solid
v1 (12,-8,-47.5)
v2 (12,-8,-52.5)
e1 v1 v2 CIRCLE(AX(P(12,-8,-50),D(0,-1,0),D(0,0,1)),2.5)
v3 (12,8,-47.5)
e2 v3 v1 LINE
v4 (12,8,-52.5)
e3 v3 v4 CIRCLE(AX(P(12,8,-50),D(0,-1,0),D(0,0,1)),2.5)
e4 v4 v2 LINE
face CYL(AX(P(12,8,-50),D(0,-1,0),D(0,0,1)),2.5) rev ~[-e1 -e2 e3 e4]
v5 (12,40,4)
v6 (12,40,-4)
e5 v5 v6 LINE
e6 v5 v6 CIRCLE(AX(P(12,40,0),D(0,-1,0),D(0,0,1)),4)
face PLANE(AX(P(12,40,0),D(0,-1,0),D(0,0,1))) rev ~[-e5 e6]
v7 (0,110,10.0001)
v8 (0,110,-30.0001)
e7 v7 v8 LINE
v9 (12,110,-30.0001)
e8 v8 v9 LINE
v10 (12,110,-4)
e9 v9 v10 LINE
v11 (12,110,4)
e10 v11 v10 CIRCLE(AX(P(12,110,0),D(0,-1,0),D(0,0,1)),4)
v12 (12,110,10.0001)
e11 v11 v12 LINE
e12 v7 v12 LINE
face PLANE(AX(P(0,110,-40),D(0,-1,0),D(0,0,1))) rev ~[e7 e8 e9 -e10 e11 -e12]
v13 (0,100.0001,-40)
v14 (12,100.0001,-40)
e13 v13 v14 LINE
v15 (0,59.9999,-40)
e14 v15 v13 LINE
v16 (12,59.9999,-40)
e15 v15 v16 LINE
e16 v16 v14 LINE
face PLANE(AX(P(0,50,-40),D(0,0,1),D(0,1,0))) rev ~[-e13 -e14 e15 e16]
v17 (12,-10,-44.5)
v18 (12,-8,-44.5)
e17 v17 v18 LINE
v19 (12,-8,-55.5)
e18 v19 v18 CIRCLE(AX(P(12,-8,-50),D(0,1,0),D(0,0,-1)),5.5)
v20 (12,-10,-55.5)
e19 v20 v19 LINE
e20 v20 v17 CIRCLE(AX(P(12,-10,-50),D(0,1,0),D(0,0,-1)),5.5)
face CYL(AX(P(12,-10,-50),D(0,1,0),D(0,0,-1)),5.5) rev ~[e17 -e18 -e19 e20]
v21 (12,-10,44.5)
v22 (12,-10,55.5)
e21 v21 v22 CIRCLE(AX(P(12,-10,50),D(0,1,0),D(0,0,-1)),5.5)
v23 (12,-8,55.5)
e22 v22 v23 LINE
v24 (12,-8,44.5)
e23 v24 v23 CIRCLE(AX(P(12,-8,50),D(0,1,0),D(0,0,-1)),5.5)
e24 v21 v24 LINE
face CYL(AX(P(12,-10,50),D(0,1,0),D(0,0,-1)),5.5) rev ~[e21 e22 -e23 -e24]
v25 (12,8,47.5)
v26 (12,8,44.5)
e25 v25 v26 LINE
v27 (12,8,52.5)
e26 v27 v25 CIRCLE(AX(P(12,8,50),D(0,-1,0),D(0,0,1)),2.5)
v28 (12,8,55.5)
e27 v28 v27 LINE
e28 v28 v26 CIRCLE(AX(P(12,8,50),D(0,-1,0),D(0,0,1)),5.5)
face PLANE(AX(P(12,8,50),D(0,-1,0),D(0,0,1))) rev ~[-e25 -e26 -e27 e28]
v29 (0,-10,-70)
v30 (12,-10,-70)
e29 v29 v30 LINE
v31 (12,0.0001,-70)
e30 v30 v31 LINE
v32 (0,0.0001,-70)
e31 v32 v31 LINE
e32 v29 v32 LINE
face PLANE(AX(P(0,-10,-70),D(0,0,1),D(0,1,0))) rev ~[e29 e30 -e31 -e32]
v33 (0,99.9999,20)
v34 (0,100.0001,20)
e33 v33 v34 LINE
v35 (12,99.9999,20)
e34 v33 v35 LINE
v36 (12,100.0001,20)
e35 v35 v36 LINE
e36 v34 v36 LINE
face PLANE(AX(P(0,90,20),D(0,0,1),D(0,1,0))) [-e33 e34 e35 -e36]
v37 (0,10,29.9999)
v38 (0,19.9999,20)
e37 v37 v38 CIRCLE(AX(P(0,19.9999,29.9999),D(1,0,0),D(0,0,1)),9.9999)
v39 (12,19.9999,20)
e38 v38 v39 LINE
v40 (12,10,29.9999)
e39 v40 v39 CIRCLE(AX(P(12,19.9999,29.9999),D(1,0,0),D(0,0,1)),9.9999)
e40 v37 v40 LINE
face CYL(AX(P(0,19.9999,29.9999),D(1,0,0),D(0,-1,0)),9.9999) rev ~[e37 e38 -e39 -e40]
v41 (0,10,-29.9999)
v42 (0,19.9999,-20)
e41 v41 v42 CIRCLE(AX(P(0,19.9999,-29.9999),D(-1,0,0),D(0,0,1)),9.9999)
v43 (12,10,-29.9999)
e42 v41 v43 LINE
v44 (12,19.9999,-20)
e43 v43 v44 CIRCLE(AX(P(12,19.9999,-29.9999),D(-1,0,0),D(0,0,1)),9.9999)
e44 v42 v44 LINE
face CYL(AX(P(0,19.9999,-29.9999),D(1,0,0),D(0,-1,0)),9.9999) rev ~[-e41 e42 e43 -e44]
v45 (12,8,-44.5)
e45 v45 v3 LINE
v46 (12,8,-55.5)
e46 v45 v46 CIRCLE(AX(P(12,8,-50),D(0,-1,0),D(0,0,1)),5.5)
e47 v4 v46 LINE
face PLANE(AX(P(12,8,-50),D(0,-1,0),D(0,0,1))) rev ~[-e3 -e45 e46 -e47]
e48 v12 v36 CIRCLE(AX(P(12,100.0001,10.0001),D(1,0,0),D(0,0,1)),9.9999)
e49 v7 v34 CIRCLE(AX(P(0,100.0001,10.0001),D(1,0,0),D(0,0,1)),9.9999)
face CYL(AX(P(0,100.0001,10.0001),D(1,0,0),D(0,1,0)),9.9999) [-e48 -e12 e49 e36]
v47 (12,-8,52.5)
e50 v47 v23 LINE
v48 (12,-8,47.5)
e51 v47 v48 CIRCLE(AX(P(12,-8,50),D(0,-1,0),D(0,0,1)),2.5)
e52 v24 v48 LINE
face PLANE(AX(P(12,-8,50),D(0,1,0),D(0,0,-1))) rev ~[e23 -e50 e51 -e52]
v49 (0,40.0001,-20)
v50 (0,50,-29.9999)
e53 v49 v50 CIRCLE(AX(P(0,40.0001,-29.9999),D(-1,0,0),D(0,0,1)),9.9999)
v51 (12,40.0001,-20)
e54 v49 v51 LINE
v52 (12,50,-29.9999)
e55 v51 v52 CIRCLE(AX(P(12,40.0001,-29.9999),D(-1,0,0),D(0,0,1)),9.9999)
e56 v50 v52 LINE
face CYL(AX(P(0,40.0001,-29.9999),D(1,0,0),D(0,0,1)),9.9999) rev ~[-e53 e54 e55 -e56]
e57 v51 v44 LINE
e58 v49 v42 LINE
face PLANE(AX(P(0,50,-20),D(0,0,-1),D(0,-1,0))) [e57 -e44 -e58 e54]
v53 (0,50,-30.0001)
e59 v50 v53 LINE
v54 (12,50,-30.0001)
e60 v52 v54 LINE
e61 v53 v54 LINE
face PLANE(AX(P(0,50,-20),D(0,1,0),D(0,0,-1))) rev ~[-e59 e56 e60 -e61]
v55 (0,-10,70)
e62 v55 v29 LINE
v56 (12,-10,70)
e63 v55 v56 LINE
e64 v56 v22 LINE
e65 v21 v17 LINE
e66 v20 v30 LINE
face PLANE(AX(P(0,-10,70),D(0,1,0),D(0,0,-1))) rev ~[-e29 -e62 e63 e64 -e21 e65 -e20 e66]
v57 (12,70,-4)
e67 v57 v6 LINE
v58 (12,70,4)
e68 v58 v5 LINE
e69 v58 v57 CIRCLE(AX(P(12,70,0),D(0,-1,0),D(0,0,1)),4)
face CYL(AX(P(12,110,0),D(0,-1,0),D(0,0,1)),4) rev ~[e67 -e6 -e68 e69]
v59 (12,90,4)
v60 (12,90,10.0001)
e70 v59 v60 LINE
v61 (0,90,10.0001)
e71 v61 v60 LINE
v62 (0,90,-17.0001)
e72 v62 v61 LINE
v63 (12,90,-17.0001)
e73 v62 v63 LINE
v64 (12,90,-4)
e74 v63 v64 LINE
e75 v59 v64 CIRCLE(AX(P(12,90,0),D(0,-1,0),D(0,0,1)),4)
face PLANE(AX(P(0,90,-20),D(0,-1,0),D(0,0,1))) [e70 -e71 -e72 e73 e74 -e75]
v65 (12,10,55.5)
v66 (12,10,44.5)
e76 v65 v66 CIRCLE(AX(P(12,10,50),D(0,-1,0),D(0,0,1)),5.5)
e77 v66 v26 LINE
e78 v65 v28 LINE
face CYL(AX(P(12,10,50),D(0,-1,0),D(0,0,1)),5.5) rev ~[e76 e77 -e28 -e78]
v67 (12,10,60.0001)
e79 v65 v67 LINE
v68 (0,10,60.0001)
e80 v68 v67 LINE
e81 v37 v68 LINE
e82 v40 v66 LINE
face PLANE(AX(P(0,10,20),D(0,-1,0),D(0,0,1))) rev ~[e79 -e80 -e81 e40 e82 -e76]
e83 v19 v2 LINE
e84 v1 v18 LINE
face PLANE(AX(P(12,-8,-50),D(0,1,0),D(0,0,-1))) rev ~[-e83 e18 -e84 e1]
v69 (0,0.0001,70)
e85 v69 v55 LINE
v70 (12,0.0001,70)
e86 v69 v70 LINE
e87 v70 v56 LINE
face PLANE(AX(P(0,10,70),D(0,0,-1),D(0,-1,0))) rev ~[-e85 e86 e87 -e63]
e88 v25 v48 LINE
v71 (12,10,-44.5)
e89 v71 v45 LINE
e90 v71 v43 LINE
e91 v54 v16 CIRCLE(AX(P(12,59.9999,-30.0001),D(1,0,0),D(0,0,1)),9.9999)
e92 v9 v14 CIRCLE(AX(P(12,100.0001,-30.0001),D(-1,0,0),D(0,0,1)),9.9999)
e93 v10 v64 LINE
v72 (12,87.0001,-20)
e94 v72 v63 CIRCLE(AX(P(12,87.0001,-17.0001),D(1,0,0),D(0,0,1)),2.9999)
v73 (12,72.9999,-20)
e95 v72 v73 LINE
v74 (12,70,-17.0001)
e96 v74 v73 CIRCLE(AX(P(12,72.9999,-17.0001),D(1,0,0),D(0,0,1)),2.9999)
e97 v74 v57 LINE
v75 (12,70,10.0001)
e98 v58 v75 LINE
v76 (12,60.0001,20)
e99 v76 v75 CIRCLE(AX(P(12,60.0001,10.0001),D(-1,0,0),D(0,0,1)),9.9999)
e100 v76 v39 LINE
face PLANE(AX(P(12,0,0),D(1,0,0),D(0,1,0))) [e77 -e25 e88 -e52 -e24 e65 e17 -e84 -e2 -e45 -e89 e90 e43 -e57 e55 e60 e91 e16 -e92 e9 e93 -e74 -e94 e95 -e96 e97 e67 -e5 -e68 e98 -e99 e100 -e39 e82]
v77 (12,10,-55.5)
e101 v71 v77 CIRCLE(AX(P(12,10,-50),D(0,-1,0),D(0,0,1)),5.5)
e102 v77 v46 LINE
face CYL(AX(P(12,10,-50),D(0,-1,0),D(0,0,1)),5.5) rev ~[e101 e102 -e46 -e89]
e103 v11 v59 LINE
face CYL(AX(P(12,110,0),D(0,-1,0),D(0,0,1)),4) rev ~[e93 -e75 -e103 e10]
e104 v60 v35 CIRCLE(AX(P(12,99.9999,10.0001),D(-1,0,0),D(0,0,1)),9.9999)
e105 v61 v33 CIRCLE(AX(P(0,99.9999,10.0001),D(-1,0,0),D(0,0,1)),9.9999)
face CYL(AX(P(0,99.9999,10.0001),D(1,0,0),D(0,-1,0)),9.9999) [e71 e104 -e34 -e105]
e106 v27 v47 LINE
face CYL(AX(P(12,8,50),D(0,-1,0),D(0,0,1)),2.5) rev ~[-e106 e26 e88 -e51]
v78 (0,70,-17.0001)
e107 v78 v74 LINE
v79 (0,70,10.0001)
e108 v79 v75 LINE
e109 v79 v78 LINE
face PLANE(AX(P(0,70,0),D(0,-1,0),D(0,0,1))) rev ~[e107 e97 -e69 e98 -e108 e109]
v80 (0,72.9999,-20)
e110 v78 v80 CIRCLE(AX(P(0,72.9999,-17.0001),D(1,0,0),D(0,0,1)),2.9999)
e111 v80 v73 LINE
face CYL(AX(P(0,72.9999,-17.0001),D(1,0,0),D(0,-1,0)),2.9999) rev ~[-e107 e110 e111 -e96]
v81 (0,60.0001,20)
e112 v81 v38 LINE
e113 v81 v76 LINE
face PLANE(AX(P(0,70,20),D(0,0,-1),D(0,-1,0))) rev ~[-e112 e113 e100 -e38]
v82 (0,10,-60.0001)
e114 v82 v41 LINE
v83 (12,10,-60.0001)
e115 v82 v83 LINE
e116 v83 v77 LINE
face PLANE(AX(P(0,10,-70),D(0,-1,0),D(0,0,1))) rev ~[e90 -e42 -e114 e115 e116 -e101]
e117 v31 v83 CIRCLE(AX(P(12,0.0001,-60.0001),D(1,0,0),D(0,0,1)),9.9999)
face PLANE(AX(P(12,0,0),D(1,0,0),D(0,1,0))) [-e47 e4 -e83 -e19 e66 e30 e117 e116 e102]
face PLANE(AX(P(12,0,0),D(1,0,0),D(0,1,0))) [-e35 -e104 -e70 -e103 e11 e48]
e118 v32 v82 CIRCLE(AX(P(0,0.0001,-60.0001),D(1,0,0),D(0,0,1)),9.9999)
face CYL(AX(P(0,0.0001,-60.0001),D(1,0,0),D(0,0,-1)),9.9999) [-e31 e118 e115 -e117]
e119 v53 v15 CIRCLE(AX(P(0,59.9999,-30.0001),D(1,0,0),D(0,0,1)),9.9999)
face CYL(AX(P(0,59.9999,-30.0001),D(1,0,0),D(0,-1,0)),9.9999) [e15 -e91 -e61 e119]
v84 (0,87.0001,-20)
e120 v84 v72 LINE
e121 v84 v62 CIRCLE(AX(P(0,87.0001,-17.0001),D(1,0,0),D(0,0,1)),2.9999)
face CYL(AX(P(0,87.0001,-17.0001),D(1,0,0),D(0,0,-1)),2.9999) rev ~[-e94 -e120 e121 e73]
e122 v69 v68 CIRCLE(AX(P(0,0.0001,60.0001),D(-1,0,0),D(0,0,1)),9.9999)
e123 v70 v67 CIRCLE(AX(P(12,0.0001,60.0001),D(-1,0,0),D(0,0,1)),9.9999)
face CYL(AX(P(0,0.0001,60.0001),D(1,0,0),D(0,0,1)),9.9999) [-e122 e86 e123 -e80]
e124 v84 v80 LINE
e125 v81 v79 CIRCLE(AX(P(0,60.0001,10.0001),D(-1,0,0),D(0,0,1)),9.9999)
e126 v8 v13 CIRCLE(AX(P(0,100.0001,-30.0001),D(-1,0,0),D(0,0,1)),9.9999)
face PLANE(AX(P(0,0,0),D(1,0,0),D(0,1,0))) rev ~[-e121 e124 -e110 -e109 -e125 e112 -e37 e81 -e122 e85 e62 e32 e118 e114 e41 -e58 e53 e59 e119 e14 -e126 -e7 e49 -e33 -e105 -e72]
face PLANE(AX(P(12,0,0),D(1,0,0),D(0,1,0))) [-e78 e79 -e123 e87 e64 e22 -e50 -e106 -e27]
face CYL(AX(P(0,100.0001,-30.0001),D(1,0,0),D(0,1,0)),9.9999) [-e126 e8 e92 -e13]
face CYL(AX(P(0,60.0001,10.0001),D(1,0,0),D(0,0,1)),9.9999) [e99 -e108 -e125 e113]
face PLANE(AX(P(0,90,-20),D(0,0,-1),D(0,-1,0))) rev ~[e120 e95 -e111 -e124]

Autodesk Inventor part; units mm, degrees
ref_plane "YZ Plane" through (0, 0, 0) normal (1, 0, 0) x (0, 1, 0)
ref_plane "XZ Plane" through (0, 0, 0) normal (0, 1, 0) x (-1, 0, 0)
ref_plane "XY Plane" through (0, 0, 0) normal (0, 0, 1) x (1, 0, 0)
sketch "Sketch1" plane through (0, 0, 0) normal (1, 0, 0) x (0, 1, 0)
  line L0 (-10, -70) -> (10, -70)
  line L1 (10, -70) -> (10, 70)
  line L2 (10, 70) -> (-10, 70)
  line L3 (-10, 70) -> (-10, -70)
  line L4 (-10, -70) -> (10, 70) construction
  line L5 (10, -70) -> (-10, 70) construction
  line L6 (10, 0) -> (70, 0)
  line L7 (70, 0) -> (70, 20)
  line L8 (70, 20) -> (10, 20)
  line L9 (10, 20) -> (10, 0)
  line L10 (70, 0) -> (70, -20)
  line L11 (70, -20) -> (10, -20)
  line L12 (10, -20) -> (10, 0)
  line L13 (90, 20) -> (110, 20)
  line L14 (110, 20) -> (110, -20)
  line L15 (110, -20) -> (90, -20)
  line L16 (90, -20) -> (90, 20)
  line L17 (110, -20) -> (50, -20)
  line L18 (50, -20) -> (50, -40)
  line L19 (50, -40) -> (110, -40)
  line L20 (110, -40) -> (110, -20)
  point P0 (0, 0)
  point P1 (90, -20)
  point P2 (70, -20)
  point P3 (50, -20)
  dimension "d0" = 20
  dimension "d1" = 140
  dimension "d2" = 80
  dimension "d3" = 20
  dimension "d17" = 60
  dimension "d18" = 20
  dimension "d19" = 20
  dimension "d20" = 20
extrude "Extrusion1" add sketch "Sketch1" along normal blind 12
fillet "Fillet1" radius 10 10 edges at (6, 10, 70) (6, 10, -70) (6, 10, 20) (6, 10, -20) (6, 70, 20) (6, 90, 20) (6, 110, 20) (6, 110, -40) (6, 50, -40) (6, 50, -20)
fillet "Fillet1" radius 3 2 edges at (6, 70, -20) (6, 90, -20)
sketch "Sketch2" plane through (0, 10, 60) normal (0, 1, 0) x (1, 0, 0)
  line L0 (12, -10) -> (12, 130) projected
  line L1 (0, -10) -> (12, -10) projected
  line L2 (12, 130) -> (0, 130) projected
  point P0 (0, 60)
  point P1 (12, 10)
  point P2 (12, 110)
  dimension "d7" = 100
  dimension "d8" = 20
  dimension "d9" = 20
hole "Hole1" at (12, 10, 50) at (12, 10, -50) direction (0, -1, 0) diameter 5 end through all counterbore diameter 11 counterbore depth 2
sketch "Sketch3" plane through (0, 110, 10) normal (0, 1, 0) x (1, 0, 0)
  line L0 (12, -37.5) -> (12, 57.5) projected
  point P0 (0, 10)
  point P1 (12, 10)
hole "Hole2" at (12, 110, 0) direction (0, -1, 0) diameter 8 depth 70
sketch "Sketch4" plane through (0, -10, -70) normal (0, -1, 0) x (1, 0, 0)
  arc A0 (12, 122.5) -> (12, 117.5) centre (12, 120) ccw projected
  arc A1 (12, 22.5) -> (12, 17.5) centre (12, 20) ccw projected
  point P0 (0, 70)
hole "Hole3" at (12, -10, 50) at (12, -10, -50) direction (0, 1, 0) diameter 11 depth 2
equation "\"d9\" = d8"
properties part number "clamp"
